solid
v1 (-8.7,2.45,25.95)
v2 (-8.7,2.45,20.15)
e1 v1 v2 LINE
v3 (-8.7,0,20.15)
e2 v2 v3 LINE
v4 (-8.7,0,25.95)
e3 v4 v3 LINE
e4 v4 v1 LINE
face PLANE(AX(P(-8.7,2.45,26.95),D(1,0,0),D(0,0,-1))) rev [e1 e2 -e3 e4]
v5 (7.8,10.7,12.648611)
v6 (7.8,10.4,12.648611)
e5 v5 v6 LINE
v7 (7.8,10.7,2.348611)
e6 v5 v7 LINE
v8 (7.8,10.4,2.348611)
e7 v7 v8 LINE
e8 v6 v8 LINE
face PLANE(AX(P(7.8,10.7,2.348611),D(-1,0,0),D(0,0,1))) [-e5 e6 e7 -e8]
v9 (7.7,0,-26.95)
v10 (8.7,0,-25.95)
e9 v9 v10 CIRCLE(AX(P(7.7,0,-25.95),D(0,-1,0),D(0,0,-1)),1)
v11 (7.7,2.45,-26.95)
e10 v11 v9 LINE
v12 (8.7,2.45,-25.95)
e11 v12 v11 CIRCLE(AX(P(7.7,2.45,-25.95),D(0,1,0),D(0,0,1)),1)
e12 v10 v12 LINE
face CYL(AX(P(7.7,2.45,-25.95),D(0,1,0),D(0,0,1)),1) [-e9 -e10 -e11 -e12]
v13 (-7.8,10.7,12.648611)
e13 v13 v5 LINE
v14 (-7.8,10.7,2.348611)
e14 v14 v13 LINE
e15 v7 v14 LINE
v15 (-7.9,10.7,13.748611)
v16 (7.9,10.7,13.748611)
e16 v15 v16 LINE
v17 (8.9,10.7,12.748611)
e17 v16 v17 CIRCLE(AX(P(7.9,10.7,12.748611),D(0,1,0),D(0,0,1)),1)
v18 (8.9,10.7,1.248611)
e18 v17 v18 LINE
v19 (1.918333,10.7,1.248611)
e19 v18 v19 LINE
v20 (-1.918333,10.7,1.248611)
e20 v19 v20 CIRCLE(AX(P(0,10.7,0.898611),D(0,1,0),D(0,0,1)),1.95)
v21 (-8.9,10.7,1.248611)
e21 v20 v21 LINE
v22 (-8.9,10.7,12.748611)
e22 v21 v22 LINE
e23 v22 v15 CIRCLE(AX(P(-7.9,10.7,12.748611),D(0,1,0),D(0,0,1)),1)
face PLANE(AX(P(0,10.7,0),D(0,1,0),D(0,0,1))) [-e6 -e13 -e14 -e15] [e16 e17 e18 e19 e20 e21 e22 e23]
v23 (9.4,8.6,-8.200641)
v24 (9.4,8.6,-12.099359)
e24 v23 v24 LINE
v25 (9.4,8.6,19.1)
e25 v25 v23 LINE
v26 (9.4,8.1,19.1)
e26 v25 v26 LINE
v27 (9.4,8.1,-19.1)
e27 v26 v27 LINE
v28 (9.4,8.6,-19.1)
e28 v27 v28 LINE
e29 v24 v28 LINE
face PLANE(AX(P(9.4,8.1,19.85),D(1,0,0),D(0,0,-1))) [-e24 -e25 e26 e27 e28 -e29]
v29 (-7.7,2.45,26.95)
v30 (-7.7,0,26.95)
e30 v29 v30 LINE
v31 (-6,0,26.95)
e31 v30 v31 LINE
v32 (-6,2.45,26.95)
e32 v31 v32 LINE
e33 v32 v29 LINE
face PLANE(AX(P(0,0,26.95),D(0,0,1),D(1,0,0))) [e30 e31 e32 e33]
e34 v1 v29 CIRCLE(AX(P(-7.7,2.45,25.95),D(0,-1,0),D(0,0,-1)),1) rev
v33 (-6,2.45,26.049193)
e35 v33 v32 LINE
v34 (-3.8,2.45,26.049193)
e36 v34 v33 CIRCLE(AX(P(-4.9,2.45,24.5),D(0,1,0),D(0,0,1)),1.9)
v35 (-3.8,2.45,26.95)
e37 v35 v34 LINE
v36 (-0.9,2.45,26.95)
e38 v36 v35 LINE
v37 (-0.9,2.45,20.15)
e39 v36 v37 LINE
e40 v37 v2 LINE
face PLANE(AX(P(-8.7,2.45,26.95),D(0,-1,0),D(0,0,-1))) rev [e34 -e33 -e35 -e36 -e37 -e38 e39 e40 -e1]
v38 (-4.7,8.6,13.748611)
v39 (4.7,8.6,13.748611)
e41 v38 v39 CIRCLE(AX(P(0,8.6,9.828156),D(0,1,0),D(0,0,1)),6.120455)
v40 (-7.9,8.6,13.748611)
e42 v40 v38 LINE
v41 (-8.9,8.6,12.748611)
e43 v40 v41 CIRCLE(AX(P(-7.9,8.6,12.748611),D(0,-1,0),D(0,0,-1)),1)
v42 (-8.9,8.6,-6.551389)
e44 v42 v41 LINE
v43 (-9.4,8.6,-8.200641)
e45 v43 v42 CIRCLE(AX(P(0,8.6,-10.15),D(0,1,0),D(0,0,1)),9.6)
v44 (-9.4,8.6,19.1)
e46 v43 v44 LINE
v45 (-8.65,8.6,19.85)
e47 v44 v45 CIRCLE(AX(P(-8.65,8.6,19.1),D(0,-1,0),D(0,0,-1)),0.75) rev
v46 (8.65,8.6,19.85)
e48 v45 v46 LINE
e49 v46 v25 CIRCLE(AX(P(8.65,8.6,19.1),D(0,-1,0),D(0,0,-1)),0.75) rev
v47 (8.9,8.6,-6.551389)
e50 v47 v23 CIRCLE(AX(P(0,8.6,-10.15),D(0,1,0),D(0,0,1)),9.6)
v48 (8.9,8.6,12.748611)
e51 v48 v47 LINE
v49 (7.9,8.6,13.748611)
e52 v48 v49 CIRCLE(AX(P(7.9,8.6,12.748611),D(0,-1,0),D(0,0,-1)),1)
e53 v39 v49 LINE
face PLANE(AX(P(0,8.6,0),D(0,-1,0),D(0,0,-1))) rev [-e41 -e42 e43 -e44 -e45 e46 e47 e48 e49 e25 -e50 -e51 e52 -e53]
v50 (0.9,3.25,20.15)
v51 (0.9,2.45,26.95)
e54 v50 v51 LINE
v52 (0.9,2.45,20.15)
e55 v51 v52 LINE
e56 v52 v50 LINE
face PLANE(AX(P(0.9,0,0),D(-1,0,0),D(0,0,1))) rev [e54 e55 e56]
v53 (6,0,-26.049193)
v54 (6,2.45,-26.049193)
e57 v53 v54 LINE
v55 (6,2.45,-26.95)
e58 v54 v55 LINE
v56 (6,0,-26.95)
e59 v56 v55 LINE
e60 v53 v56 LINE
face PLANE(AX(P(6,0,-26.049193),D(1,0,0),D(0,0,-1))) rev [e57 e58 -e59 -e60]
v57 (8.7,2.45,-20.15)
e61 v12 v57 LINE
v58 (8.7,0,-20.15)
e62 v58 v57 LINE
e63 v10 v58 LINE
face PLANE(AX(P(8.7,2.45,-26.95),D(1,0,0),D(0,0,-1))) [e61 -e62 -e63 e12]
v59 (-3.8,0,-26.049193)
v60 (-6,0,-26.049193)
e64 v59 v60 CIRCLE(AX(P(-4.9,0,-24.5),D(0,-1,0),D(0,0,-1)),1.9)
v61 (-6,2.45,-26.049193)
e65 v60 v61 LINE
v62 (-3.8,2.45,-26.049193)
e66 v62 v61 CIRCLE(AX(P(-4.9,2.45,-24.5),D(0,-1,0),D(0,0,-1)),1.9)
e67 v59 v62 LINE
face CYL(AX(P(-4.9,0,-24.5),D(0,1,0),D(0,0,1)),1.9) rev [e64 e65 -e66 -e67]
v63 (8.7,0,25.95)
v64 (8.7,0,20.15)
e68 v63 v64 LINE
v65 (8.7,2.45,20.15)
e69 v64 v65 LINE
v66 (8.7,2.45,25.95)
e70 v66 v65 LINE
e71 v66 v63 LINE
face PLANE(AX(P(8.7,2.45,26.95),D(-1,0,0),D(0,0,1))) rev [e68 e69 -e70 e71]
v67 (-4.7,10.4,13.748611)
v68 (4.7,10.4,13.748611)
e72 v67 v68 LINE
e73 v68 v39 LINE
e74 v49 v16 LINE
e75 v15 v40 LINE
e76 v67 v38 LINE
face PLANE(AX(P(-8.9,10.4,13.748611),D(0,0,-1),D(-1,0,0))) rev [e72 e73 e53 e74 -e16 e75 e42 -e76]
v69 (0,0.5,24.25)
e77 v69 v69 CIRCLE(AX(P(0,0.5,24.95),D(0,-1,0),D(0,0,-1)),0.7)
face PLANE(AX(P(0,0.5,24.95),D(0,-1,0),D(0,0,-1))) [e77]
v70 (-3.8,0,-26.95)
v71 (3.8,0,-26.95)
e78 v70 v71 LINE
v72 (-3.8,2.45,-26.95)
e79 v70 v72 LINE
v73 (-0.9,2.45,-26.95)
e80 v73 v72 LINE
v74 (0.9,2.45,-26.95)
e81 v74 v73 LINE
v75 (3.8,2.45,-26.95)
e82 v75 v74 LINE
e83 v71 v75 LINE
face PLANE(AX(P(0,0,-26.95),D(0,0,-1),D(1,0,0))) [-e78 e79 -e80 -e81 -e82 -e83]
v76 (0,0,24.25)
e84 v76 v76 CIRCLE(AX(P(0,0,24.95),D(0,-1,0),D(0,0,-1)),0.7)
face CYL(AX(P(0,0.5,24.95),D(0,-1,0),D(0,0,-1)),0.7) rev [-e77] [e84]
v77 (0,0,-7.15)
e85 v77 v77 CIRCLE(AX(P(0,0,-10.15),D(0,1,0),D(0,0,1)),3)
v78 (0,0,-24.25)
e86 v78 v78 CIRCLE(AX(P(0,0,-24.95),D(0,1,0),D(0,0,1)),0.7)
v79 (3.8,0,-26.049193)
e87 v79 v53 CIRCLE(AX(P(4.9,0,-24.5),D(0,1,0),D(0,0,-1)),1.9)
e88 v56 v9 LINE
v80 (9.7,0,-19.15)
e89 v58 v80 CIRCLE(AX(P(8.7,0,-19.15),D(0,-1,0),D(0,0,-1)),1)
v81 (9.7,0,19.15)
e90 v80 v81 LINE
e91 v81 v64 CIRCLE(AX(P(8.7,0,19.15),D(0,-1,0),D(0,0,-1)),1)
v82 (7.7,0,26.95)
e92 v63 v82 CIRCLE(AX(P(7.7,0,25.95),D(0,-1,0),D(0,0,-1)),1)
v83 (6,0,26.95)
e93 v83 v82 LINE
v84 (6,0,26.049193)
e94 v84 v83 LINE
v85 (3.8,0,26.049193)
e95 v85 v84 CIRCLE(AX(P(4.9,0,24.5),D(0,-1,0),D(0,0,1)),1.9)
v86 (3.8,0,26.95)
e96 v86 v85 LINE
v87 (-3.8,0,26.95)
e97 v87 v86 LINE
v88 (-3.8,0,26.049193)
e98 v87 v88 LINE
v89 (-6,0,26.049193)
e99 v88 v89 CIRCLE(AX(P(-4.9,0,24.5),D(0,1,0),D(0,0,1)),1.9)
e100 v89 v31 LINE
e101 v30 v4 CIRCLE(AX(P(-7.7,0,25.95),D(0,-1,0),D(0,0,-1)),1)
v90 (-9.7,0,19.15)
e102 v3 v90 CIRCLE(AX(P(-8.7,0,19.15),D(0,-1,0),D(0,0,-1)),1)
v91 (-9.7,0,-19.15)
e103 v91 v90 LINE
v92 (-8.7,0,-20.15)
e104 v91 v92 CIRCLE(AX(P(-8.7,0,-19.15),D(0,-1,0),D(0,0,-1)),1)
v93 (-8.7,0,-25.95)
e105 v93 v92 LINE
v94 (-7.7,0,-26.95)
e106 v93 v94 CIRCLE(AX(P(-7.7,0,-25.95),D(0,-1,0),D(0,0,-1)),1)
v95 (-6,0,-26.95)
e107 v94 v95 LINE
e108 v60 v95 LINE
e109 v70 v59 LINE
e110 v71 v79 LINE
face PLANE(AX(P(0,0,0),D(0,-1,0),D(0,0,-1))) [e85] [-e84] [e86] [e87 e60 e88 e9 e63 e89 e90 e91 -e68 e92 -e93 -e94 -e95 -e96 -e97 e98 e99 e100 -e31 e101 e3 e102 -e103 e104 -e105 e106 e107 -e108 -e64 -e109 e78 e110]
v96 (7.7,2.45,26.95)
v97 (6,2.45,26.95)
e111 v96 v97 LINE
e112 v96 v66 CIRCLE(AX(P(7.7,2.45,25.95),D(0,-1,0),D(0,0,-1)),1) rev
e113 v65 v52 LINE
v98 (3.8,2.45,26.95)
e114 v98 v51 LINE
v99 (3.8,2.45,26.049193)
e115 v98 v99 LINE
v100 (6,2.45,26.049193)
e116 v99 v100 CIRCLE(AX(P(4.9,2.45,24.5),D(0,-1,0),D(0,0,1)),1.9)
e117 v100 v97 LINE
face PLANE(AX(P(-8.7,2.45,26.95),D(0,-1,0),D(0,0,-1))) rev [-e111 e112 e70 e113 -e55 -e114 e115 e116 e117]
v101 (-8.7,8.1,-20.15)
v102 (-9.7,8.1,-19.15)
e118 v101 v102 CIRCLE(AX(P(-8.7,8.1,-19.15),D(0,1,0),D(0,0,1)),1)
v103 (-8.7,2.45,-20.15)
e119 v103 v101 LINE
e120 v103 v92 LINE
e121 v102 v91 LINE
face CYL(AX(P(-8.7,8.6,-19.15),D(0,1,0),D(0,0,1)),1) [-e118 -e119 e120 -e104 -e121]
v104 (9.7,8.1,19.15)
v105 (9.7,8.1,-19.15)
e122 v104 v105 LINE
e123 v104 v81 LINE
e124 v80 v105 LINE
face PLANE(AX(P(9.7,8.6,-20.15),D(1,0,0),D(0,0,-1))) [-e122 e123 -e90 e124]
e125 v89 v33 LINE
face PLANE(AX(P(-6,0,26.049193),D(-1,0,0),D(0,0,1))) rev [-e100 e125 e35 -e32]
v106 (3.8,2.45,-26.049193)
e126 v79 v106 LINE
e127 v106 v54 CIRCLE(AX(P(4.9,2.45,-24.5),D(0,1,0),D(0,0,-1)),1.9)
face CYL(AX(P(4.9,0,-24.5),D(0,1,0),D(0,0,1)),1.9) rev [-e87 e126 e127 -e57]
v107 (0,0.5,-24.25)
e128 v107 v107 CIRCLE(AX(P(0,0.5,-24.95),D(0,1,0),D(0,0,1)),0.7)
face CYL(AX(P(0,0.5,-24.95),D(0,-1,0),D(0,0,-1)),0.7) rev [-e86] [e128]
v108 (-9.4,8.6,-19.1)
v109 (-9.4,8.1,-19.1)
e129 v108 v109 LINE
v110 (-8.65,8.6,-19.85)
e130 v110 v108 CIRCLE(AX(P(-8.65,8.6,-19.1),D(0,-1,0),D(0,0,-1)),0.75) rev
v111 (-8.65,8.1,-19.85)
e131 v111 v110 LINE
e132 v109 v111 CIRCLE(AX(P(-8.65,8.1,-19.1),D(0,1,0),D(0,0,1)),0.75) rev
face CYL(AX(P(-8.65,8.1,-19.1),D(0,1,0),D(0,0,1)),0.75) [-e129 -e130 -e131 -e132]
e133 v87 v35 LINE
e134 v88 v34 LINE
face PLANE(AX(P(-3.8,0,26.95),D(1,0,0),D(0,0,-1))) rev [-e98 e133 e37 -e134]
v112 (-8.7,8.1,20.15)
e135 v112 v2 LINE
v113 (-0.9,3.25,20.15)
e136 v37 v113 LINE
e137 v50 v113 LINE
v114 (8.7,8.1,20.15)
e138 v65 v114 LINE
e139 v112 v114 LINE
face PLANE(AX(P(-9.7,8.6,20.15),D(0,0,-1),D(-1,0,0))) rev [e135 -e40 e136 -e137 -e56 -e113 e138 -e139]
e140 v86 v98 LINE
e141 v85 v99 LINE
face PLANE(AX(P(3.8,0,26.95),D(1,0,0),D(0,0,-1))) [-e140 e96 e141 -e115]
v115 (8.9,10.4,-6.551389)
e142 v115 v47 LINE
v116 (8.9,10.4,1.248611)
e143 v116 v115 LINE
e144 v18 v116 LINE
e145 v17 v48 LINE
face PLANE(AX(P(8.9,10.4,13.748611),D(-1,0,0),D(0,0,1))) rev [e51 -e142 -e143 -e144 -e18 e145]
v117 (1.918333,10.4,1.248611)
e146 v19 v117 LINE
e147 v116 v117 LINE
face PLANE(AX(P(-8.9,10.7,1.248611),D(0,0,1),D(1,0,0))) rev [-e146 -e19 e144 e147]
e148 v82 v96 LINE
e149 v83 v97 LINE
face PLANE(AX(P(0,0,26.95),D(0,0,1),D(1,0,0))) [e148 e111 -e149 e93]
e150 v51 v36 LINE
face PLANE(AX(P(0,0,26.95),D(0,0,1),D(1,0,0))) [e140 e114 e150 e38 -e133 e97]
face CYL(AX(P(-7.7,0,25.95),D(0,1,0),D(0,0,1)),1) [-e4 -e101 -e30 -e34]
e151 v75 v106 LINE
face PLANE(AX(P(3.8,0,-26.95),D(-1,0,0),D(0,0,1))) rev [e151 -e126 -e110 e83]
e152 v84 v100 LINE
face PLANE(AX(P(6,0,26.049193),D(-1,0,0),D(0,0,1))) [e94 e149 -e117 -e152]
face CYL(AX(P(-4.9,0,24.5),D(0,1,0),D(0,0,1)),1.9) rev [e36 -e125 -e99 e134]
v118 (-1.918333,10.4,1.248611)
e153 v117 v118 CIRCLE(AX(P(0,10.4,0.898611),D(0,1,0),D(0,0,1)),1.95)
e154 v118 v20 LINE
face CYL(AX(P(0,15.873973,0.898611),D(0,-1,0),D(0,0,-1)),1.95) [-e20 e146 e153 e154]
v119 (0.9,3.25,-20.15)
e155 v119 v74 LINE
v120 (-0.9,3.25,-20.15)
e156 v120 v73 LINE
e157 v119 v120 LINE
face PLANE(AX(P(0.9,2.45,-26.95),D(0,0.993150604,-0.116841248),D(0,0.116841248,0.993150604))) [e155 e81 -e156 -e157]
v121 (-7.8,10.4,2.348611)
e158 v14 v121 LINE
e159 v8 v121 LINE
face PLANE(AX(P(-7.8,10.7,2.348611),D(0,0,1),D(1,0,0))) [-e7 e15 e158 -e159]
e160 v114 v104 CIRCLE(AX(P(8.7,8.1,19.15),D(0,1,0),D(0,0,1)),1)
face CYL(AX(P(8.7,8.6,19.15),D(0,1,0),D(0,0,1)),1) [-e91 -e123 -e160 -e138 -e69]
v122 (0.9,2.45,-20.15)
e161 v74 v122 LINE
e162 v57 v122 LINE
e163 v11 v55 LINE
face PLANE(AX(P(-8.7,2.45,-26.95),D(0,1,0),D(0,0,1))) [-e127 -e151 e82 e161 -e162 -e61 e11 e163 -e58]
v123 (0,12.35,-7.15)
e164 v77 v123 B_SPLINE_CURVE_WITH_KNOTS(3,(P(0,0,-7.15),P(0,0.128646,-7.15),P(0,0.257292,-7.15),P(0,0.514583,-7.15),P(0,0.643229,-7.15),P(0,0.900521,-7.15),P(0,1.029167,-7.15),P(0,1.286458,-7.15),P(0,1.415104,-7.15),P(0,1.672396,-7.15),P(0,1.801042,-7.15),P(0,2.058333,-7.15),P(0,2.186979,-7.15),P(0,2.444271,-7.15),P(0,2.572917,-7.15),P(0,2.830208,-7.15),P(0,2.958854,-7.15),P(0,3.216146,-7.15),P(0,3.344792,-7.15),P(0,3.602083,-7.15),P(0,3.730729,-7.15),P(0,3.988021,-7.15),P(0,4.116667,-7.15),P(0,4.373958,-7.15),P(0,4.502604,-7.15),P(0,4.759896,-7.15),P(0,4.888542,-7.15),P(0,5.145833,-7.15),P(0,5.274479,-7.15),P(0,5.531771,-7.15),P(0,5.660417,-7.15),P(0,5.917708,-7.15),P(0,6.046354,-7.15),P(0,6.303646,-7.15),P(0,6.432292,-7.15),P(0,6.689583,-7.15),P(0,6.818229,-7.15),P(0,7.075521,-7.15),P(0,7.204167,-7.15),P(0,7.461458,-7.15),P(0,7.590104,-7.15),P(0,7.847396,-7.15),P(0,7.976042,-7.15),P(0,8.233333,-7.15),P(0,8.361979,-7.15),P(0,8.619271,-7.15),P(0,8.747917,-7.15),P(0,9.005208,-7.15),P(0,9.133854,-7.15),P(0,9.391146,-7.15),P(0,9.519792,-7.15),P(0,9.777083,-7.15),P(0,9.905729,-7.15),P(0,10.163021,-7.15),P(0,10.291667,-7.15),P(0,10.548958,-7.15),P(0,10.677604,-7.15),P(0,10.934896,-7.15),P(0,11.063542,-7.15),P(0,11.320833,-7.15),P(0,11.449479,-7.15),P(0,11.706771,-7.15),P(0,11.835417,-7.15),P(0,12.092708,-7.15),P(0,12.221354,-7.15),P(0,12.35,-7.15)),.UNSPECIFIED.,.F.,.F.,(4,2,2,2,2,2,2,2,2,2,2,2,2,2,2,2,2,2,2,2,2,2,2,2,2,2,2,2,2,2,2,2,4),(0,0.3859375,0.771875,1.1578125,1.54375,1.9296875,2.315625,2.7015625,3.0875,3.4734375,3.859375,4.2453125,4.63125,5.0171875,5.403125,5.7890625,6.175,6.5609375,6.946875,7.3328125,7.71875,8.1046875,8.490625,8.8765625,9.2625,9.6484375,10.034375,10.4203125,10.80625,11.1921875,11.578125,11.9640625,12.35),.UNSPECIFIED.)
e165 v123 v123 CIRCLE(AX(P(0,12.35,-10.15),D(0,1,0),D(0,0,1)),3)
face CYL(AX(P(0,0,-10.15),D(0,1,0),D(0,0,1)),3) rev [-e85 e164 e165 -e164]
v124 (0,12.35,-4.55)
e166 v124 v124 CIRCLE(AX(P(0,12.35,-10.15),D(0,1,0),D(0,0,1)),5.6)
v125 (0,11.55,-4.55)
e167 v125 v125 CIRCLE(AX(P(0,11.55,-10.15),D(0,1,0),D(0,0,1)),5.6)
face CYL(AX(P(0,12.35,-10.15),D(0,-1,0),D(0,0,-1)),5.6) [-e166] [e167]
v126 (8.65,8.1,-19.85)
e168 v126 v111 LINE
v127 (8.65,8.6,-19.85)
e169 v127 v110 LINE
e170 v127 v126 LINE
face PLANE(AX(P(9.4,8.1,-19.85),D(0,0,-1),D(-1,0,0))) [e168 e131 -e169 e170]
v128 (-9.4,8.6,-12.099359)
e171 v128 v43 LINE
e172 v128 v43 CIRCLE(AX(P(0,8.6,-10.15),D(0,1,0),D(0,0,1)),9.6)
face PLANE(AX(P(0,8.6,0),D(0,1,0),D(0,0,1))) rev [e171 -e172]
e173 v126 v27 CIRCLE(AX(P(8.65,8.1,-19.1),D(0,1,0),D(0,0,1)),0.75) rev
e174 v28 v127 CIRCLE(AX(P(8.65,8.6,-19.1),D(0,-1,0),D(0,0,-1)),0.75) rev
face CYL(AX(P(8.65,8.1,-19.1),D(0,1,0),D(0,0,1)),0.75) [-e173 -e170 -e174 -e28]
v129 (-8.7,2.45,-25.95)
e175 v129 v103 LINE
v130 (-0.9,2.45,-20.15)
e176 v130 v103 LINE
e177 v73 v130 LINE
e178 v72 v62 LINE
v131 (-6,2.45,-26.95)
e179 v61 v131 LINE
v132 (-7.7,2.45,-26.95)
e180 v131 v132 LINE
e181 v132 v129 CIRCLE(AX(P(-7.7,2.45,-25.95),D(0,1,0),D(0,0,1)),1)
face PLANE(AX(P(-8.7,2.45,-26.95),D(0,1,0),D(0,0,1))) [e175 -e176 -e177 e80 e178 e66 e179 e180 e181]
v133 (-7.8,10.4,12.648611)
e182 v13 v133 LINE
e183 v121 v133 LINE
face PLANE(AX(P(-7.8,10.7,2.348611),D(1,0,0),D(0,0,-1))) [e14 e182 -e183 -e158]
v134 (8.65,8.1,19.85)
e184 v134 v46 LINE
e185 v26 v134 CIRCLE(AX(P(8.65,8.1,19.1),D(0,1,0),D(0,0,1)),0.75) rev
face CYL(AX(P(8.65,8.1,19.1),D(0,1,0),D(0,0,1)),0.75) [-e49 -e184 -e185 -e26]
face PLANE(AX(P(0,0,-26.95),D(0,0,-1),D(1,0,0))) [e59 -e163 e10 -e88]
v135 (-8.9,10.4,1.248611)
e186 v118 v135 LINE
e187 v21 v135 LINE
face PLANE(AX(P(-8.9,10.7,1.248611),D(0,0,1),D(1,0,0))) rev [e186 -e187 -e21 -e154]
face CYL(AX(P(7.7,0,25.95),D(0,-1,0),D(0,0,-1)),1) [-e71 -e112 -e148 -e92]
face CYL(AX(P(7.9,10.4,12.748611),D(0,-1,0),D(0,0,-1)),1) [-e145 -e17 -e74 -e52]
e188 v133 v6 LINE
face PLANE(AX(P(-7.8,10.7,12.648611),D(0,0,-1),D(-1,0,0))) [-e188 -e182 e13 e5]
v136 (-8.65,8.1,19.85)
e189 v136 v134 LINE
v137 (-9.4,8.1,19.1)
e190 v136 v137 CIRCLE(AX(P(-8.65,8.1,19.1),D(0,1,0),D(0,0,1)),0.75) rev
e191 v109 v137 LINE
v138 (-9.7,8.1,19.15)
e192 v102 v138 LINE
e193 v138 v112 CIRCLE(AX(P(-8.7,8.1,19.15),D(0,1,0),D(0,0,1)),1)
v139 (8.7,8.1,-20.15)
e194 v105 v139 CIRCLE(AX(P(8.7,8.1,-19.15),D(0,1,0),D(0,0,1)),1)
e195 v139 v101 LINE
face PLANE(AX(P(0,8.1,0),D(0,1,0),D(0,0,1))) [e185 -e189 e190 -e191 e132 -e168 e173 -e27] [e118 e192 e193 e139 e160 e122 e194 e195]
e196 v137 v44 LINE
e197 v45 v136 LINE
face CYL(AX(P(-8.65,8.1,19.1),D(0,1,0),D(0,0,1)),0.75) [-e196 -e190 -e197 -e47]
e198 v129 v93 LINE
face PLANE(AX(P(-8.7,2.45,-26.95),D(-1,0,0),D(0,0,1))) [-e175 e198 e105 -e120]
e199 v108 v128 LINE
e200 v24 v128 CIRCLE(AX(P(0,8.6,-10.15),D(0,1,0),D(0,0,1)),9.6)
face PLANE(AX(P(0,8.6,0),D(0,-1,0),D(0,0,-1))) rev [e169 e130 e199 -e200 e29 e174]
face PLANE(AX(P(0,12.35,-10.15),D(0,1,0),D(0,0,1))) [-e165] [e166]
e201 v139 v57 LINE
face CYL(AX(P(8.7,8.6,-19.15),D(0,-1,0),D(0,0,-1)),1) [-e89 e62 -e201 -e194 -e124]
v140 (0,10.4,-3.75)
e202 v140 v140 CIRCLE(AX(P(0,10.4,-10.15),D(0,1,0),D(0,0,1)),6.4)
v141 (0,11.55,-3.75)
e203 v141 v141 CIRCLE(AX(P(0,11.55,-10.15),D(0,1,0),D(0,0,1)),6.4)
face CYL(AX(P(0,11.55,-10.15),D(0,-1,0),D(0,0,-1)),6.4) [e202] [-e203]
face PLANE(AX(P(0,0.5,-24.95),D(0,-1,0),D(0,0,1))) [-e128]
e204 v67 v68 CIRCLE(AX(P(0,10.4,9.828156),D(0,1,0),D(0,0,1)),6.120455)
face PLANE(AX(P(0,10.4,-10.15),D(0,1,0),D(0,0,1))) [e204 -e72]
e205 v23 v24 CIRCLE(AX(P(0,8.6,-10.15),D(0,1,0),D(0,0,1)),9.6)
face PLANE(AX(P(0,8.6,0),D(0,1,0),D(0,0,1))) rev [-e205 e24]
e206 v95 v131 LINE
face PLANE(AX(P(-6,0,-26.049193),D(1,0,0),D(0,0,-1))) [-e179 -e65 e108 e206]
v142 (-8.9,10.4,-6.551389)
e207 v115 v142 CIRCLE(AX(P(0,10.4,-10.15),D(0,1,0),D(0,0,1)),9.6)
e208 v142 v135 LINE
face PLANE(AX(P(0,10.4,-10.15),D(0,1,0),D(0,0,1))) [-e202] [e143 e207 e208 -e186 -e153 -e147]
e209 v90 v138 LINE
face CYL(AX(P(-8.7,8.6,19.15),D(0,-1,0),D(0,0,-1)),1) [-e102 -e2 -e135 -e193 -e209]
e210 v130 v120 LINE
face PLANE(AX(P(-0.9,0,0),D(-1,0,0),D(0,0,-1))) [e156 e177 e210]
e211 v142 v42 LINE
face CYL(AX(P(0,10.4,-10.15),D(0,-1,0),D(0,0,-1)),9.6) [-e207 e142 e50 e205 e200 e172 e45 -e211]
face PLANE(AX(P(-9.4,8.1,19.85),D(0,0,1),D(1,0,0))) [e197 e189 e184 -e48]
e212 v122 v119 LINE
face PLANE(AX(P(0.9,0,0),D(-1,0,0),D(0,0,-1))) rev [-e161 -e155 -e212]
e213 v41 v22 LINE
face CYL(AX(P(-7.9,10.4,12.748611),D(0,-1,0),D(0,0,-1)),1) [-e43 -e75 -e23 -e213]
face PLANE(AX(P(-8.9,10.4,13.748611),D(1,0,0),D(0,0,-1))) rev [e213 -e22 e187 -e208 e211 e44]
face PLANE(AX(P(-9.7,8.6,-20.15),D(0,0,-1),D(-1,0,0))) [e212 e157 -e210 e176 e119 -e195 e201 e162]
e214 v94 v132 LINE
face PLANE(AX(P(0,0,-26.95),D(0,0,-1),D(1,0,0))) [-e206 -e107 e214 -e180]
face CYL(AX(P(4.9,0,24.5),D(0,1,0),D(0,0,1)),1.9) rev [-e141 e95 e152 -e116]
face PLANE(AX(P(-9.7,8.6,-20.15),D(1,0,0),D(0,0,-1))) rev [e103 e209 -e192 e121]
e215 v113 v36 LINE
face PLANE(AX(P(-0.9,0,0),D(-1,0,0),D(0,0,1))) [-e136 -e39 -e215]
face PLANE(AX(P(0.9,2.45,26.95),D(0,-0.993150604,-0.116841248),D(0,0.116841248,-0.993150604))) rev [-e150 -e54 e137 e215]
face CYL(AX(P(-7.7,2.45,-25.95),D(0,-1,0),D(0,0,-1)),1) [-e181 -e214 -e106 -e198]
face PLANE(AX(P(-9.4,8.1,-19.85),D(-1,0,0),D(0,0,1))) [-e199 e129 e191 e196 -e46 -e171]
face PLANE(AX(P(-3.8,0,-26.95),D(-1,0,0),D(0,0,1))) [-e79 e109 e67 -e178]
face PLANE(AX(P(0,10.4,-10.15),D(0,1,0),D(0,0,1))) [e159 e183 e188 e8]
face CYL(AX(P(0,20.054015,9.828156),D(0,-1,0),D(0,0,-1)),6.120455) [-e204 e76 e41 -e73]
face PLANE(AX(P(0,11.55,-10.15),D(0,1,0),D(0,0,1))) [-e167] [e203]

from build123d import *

# Parameters (mm, degrees)
BASES_W                              = 19.4
BASES_H                              = 40.3
BASE_DEPTH                           = 8.6
SHAFTHOLES_R                         = 3
SHAFT_HOLE_DEPTH                     = 24.959810099
MOUNTINGTABS_W                       = 17.4
MOUNTINGTABS_H                       = 2.45
MOUNTING_TAB_DEPTH                   = 6.8
MOUNTING_HOLE_DEPTH                  = 30.295306791
BOTTOMALIGNHOLES_R                   = 0.7
BOTTOM_ALIGN_HOLE_DEPTH              = 0.5
TRIANGULAR_TAB_DEPTH                 = 0.9
MOUNTING_TAB_FEATURES_M_COPY_1_DEPTH = 30.295306791
BASE_START                           = 1.8
BASETOPBODYS_R                       = 3
BASE_TOP_BODY_DEPTH                  = 1.8
PART_CIRCLE_DEPTH                    = 1.8
TOP_START                            = 1.15
TOPBODYCYLINDER1_R                   = 6.4
TOPBODYCYLINDER1_R_2                 = 3
TOP_BODY_CYLINDER_1_DEPTH            = 1.15
TOB_START                            = 0.8
TOPBODYCYLINDER2_R                   = 5.6
TOPBODYCYLINDER2_R_2                 = 3
TOB_BODY_CYLINDER_2_DEPTH            = 0.8
TOPBODYLABELNEST_W                   = 17.8
TOPBODYLABELNEST_H                   = 12.5
TOPBODYLABELNEST_W_2                 = 15.6
TOPBODYLABELNEST_H_2                 = 10.3
TOP_BODY_LABEL_NEST_DEPTH            = 0.3
PART_CIRCLE_2_DEPTH                  = 0.3
BORDERCUTS_W                         = 19.4
BORDERCUTS_H                         = 40.3
BORDERCUTS_W_2                       = 18.8
BORDERCUTS_H_2                       = 39.7
BORDER_CUT_DEPTH                     = 0.5
MAIN_BODY_FEATURES_F_R               = 1
BORDER_CUT_F_R                       = 0.75


with BuildPart() as part:
    # BaseS → BASE (new body)
    with BuildSketch(Plane(origin=(0, 0, 0), x_dir=(1, 0, 0), z_dir=(0, 1, 0))):
        Rectangle(BASES_W, BASES_H)
    extrude(amount=BASE_DEPTH)

    # ShaftHoleS → SHAFT HOLE (cut, through all)
    with BuildSketch(Plane(origin=(0, 8.6, 0), x_dir=(1, 0, 0), z_dir=(0, 1, 0))):
        with Locations(Location((0, 10.15, 0), (0, 0, 270))):
            Circle(SHAFTHOLES_R)
    extrude(amount=-SHAFT_HOLE_DEPTH, mode=Mode.SUBTRACT)

    # MountingTabS → MOUNTING TAB (add)
    with BuildSketch(Plane.XY.offset(20.15)):
        with Locations((0, 1.225)):
            Rectangle(MOUNTINGTABS_W, MOUNTINGTABS_H)
    mounting_tab = extrude(amount=MOUNTING_TAB_DEPTH)

    # MountingHoleS → MOUNTING HOLE (cut, through all)
    with BuildSketch(Plane(origin=(0, 2.45, 0), x_dir=(1, 0, 0), z_dir=(0, 1, 0))):
        with BuildLine():
            Line((-6, -26.049193338), (-6, -26.95))
            Line((-6, -26.95), (-3.8, -26.95))
            Line((-3.8, -26.95), (-3.8, -26.049193338))
            ThreePointArc((-3.8, -26.049193338), (-4.9, -22.6), (-6, -26.049193338))
        make_face()
    mounting_hole = extrude(amount=-MOUNTING_HOLE_DEPTH, mode=Mode.SUBTRACT)

    # MH M: MOUNTING HOLE across plane
    add(mounting_hole.mirror(Plane(origin=(0, 0, 0), x_dir=(0, 0, 1), z_dir=(1, 0, 0))), mode=Mode.SUBTRACT)

    # BottomAlignHoleS → BOTTOM ALIGN HOLE (cut)
    with BuildSketch(Plane.XZ):
        with Locations(Location((0, 24.95, 0), (0, 0, 270))):
            Circle(BOTTOMALIGNHOLES_R)
    bottom_align_hole = extrude(amount=-BOTTOM_ALIGN_HOLE_DEPTH, mode=Mode.SUBTRACT)

    # TriangularTabS → TRIANGULAR TAB (add, symmetric)
    with BuildSketch(Plane(origin=(0, 0, 0), x_dir=(0, 0, -1), z_dir=(1, 0, 0))):
        Polygon((-20.15, 2.45), (-26.95, 2.45), (-20.15, 3.25), align=None)
    triangular_tab = extrude(amount=TRIANGULAR_TAB_DEPTH, both=True)

    # MOUNTING TAB FEATURES M: MOUNTING TAB, MOUNTING HOLE, BOTTOM ALIGN HOLE, TRIANGULAR TAB across plane
    add(mounting_tab.mirror(Plane.XY))
    add(mounting_hole.mirror(Plane.XY), mode=Mode.SUBTRACT)
    add(bottom_align_hole.mirror(Plane.XY), mode=Mode.SUBTRACT)
    add(triangular_tab.mirror(Plane.XY))

    # MOUNTING TAB FEATURES M copy 1 sketch → MOUNTING TAB FEATURES M copy 1 (cut, through all)
    with BuildSketch(Plane(origin=(0, 2.45, 0), x_dir=(-1, 0, 0), z_dir=(0, 1, 0))):
        with BuildLine():
            Line((-6, -26.049193338), (-6, -26.95))
            Line((-6, -26.95), (-3.8, -26.95))
            Line((-3.8, -26.95), (-3.8, -26.049193338))
            ThreePointArc((-3.8, -26.049193338), (-4.9, -22.6), (-6, -26.049193338))
        make_face()
    extrude(amount=-MOUNTING_TAB_FEATURES_M_COPY_1_DEPTH, mode=Mode.SUBTRACT)

    # BaseTopBodyS → BASE TOP BODY (add)
    with BuildSketch(Plane(origin=(0, 8.6, 0), x_dir=(1, 0, 0), z_dir=(0, 1, 0)).offset(BASE_START)):
        with BuildLine():
            Line((-8.9, -13.748610843), (8.9, -13.748610843))
            Line((8.9, -13.748610843), (8.9, 6.551389157))
            ThreePointArc((8.9, 6.551389157), (0, 19.75), (-8.9, 6.551389157))
            Line((-8.9, 6.551389157), (-8.9, -13.748610843))
        make_face()
        with Locations(Location((0, 10.15, 0), (0, 0, 270))):
            Circle(BASETOPBODYS_R, mode=Mode.SUBTRACT)
    extrude(amount=-BASE_TOP_BODY_DEPTH)

    # PartCircleS → PART CIRCLE (add)
    with BuildSketch(Plane(origin=(0, 8.6, 0), x_dir=(1, 0, 0), z_dir=(0, 1, 0))):
        with BuildLine():
            Line((-4.7, -13.748610843), (4.7, -13.748610843))
            ThreePointArc((4.7, -13.748610843), (0, -15.948610843), (-4.7, -13.748610843))
        make_face()
    extrude(amount=PART_CIRCLE_DEPTH)

    # TopBodyCylinder1 → TOP BODY CYLINDER 1 (add)
    with BuildSketch(Plane(origin=(0, 10.4, 0), x_dir=(1, 0, 0), z_dir=(0, 1, 0)).offset(TOP_START)):
        with Locations(Location((0, 10.15, 0), (0, 0, 270))):
            Circle(TOPBODYCYLINDER1_R)
        with Locations(Location((0, 10.15, 0), (0, 0, 270))):
            Circle(TOPBODYCYLINDER1_R_2, mode=Mode.SUBTRACT)
    extrude(amount=-TOP_BODY_CYLINDER_1_DEPTH)

    # TopBodyCylinder2 → TOB BODY CYLINDER 2 (add)
    with BuildSketch(Plane(origin=(0, 11.55, 0), x_dir=(1, 0, 0), z_dir=(0, 1, 0)).offset(TOB_START)):
        with Locations(Location((0, 10.15, 0), (0, 0, 270))):
            Circle(TOPBODYCYLINDER2_R)
        with Locations(Location((0, 10.15, 0), (0, 0, 270))):
            Circle(TOPBODYCYLINDER2_R_2, mode=Mode.SUBTRACT)
    extrude(amount=-TOB_BODY_CYLINDER_2_DEPTH)

    # TopBodyLabelNest → TOP BODY LABEL NEST (add)
    with BuildSketch(Plane(origin=(0, 10.4, 0), x_dir=(1, 0, 0), z_dir=(0, 1, 0))):
        with Locations((0, -7.498610843)):
            Rectangle(TOPBODYLABELNEST_W, TOPBODYLABELNEST_H)
        with Locations((0, -7.498610843)):
            Rectangle(TOPBODYLABELNEST_W_2, TOPBODYLABELNEST_H_2, mode=Mode.SUBTRACT)
    extrude(amount=TOP_BODY_LABEL_NEST_DEPTH)

    # PartCircle2S → PART CIRCLE 2 (add)
    with BuildSketch(Plane(origin=(0, 10.4, 0), x_dir=(1, 0, 0), z_dir=(0, 1, 0))):
        with BuildLine():
            Line((1.303840481, -2.348610843), (-1.303840481, -2.348610843))
            ThreePointArc((-1.303840481, -2.348610843), (0, 1.051389157), (1.303840481, -2.348610843))
        make_face()
    extrude(amount=PART_CIRCLE_2_DEPTH)

    # BorderCutS → BORDER CUT (cut)
    with BuildSketch(Plane(origin=(0, 8.6, 0), x_dir=(1, 0, 0), z_dir=(0, 1, 0))):
        Rectangle(BORDERCUTS_W, BORDERCUTS_H)
        Rectangle(BORDERCUTS_W_2, BORDERCUTS_H_2, mode=Mode.SUBTRACT)
    extrude(amount=-BORDER_CUT_DEPTH, mode=Mode.SUBTRACT)

    # MAIN BODY FEATURES F
    main_body_features_f_edges = [part.edges().sort_by_distance(p)[0] for p in [
        (8.7, 1.225, -26.95),
        (-8.7, 1.225, -26.95),
        (-9.7, 4.05, -20.15),
        (9.7, 4.05, -20.15),
        (-8.9, 9.65, 13.748610843),
        (8.9, 9.65, 13.748610843),
        (-9.7, 4.05, 20.15),
        (9.7, 4.05, 20.15),
        (8.7, 1.225, 26.95),
        (-8.7, 1.225, 26.95),
    ]]
    fillet(main_body_features_f_edges, radius=MAIN_BODY_FEATURES_F_R - 0.0001)  # a hair under: the kernel refuses the full size

    # BORDER CUT F
    border_cut_f_edges = [part.edges().sort_by_distance(p)[0] for p in [
        (9.4, 8.35, -19.85),
        (9.4, 8.35, 19.85),
        (-9.4, 8.35, 19.85),
        (-9.4, 8.35, -19.85),
    ]]
    fillet(border_cut_f_edges, radius=BORDER_CUT_F_R)


solid = part.part
